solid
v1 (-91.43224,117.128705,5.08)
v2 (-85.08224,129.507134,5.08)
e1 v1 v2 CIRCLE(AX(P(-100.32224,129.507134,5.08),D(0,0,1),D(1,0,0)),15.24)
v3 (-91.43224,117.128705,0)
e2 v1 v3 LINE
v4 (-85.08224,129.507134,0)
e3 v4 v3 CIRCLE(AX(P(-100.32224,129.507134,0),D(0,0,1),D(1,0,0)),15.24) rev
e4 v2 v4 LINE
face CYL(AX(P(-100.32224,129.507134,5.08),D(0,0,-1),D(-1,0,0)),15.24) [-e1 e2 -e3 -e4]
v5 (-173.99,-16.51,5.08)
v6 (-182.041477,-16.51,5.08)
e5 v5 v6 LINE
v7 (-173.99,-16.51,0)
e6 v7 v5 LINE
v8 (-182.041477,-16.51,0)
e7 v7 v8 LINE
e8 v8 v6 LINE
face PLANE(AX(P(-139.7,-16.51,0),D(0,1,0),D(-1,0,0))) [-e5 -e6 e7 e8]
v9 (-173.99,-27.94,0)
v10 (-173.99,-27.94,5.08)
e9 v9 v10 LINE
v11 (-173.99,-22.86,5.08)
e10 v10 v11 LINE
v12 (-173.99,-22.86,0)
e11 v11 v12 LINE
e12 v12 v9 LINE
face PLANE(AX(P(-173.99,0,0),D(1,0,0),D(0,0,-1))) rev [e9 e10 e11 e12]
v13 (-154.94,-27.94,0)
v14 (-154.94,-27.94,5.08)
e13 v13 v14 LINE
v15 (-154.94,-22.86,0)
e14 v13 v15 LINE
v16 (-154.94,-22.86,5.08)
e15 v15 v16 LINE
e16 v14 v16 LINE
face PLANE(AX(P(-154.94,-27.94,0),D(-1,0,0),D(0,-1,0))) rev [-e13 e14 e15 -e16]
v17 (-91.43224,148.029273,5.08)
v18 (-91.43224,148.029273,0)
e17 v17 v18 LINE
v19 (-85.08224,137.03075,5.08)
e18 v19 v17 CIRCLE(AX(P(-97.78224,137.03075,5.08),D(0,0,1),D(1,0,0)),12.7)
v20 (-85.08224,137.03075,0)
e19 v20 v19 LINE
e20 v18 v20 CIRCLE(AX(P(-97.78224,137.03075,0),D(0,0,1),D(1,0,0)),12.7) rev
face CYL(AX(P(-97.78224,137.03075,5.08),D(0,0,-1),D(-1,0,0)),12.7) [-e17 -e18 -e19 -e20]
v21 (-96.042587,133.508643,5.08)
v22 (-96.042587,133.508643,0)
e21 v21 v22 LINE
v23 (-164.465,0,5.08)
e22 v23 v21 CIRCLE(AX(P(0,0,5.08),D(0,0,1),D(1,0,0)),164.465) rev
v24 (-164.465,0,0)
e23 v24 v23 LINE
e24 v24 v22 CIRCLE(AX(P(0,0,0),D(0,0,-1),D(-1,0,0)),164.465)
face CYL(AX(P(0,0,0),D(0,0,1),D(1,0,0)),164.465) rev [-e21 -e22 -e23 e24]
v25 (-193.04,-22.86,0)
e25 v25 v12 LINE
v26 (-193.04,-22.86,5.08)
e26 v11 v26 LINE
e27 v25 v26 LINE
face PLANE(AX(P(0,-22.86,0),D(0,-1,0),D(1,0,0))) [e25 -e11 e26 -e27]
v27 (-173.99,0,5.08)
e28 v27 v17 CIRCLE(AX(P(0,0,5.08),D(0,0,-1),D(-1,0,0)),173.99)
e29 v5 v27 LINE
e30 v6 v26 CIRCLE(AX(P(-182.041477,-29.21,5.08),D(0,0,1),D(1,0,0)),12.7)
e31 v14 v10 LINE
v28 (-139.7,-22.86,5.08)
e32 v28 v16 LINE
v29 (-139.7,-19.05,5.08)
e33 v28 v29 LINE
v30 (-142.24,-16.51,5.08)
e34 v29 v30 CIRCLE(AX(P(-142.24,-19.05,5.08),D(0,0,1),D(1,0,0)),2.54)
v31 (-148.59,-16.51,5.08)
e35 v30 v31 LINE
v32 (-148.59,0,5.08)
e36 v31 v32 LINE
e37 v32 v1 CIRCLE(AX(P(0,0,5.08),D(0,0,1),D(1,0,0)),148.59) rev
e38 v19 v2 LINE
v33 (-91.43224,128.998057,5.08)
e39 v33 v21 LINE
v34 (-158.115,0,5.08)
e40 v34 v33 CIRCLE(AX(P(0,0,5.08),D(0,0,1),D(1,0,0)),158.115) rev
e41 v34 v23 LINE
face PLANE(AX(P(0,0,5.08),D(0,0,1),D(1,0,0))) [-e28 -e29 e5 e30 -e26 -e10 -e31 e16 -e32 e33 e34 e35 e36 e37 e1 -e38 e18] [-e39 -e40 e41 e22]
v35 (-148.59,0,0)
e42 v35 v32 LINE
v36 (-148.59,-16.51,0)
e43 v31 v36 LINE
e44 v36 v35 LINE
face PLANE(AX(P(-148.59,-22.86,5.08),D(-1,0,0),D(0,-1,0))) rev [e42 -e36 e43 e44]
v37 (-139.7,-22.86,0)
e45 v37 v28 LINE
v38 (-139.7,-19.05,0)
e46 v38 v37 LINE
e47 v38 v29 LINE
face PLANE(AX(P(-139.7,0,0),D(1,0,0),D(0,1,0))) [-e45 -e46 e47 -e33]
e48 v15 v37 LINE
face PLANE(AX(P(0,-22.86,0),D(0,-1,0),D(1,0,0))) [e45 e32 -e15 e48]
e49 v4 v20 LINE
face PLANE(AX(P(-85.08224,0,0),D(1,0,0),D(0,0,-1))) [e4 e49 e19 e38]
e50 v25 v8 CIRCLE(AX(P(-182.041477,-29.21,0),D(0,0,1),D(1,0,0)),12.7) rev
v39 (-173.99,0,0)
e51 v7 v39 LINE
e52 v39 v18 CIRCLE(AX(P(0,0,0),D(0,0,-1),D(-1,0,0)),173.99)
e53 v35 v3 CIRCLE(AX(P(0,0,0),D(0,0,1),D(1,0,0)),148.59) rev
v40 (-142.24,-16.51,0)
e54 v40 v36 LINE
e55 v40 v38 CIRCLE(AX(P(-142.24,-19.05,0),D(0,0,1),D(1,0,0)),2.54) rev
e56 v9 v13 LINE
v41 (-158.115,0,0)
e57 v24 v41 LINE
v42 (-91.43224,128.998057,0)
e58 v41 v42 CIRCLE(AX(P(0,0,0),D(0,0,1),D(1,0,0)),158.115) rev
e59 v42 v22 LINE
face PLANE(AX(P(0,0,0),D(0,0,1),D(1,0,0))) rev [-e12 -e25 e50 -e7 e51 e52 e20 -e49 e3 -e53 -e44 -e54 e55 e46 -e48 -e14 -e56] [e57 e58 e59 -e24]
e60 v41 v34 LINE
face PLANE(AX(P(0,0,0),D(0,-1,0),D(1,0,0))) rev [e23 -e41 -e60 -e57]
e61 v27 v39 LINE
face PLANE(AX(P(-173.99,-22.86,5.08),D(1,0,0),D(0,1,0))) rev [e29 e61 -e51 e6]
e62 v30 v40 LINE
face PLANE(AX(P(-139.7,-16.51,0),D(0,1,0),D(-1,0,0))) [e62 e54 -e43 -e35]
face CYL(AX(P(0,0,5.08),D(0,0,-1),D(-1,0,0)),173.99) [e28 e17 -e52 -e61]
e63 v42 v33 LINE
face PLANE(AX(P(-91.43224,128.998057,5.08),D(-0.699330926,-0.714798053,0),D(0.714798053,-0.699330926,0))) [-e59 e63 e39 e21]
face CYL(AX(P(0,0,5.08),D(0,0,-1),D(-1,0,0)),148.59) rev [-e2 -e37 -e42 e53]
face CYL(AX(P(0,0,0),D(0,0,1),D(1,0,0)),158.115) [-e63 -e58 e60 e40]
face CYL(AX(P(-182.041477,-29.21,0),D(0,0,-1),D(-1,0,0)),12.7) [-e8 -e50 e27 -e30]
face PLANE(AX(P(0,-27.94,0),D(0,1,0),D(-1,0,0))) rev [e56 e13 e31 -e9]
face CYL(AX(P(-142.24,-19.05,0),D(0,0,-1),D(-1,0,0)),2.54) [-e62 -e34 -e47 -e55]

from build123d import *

# Parameters (mm, degrees)
EXTRUDE_THIN2_DEPTH          = 5.08
CUT_EXTRUDE_THIN3_DEPTH      = 247.111451582
CUT_EXTRUDE_THIN3_DEPTH_BACK = 5.08
SKETCH9_W                    = 25.4
SKETCH9_H                    = 5.08
BOSS_EXTRUDE3_DEPTH          = 22.86
BOSS_EXTRUDE4_DEPTH          = 19.05
BOSS_EXTRUDE4_DEPTH_BACK     = 34.29
SKETCH10_W                   = 5.08
SKETCH10_H                   = 6.35
SKETCH11_W                   = 12.7
SKETCH11_H                   = 5.08
BOSS_EXTRUDE5_DEPTH          = 5.08
SKETCH12_W                   = 168.813467259
SKETCH12_H                   = 220.237806267
CUT_EXTRUDE1_DEPTH           = 260.928390331
SKETCH13_W                   = 5.08
SKETCH13_H                   = 30.900567514
BOSS_EXTRUDE6_DEPTH          = 6.35
FILLET2_R                    = 15.24
FILLET3_R                    = 12.7
FILLET4_R                    = 12.7
FILLET5_R                    = 2.54
BOSS_EXTRUDE14_DEPTH         = 5.08
SKETCH16_W                   = 5.08
SKETCH16_H                   = 5.08
BOSS_EXTRUDE15_DEPTH         = 6.35


with BuildPart() as part:
    # Sketch7 → Extrude-Thin2 (new body)
    with BuildSketch(Plane.XY):
        with BuildLine():
            ThreePointArc((-173.99, 0), (-123.029508859, 123.029508859), (0, 173.99))
            Line((0, 173.99), (0, 148.59))
            ThreePointArc((0, 148.59), (-105.068996617, 105.068996617), (-148.59, 0))
            Line((-148.59, 0), (-173.99, 0))
        make_face()
    extrude(amount=EXTRUDE_THIN2_DEPTH)

    # Sketch8 → Cut-Extrude-Thin3 (cut, two sides: drawn at the far end of the back side and taken through both)
    with BuildSketch(Plane.XY.offset(5.08).offset(-CUT_EXTRUDE_THIN3_DEPTH_BACK)):
        with BuildLine():
            ThreePointArc((-164.465, 0), (-116.294316768, 116.294316768), (0, 164.465))
            Line((0, 164.465), (0, 158.115))
            ThreePointArc((0, 158.115), (-111.804188707, 111.804188707), (-158.115, 0))
            Line((-158.115, 0), (-164.465, 0))
        make_face()
    extrude(amount=CUT_EXTRUDE_THIN3_DEPTH + CUT_EXTRUDE_THIN3_DEPTH_BACK, mode=Mode.SUBTRACT)


with BuildPart() as cut_extrude_thin3_piece_1:
    # of the separate pieces the step leaves, piece 1, a body of its own (cut_extrude_thin3_pieces)
    add(part.part.solids().sort_by_distance((0, 173.99, 0))[0])



with BuildPart() as cut_extrude_thin3_piece_2:
    # of the separate pieces the step leaves, piece 2, a body of its own (cut_extrude_thin3_pieces)
    add(part.part.solids().sort_by_distance((0, 158.115, 0))[0])


with BuildPart() as cut_extrude_thin3_piece_1_1:
    add(cut_extrude_thin3_piece_1.part)

    add(cut_extrude_thin3_piece_2.part)  # Boss-Extrude3 merges Cut-Extrude-Thin3 piece 2
    # Sketch9 → Boss-Extrude3 (add)
    with BuildSketch(Plane.XZ):
        with Locations((-161.29, 2.54)):
            Rectangle(SKETCH9_W, SKETCH9_H)
    extrude(amount=BOSS_EXTRUDE3_DEPTH)

    # Sketch10 → Boss-Extrude4 (add, two sides: drawn at the far end of the back side and taken through both)
    with BuildSketch(Plane.ZY.offset(173.99).offset(-BOSS_EXTRUDE4_DEPTH_BACK)):
        with Locations((2.54, -19.685)):
            Rectangle(SKETCH10_W, SKETCH10_H)
    extrude(amount=BOSS_EXTRUDE4_DEPTH + BOSS_EXTRUDE4_DEPTH_BACK)

    # Sketch11 → Boss-Extrude5 (add)
    with BuildSketch(Plane.XZ.offset(22.86)):
        with Locations((-161.29, 2.54)):
            Rectangle(SKETCH11_W, SKETCH11_H)
    extrude(amount=BOSS_EXTRUDE5_DEPTH)

    # Sketch12 → Cut-Extrude1 (cut, through all)
    with BuildSketch(Plane.XY.offset(5.08)):
        with Locations((-7.025506372, 87.258903133)):
            Rectangle(SKETCH12_W, SKETCH12_H)
    extrude(amount=-CUT_EXTRUDE1_DEPTH, mode=Mode.SUBTRACT)

    # Sketch13 → Boss-Extrude6 (add)
    with BuildSketch(Plane(origin=(-91.432240001, 0, 0), x_dir=(0, 0, -1), z_dir=(1, 0, 0))):
        with Locations((-2.54, 132.578988985)):
            Rectangle(SKETCH13_W, SKETCH13_H)
    extrude(amount=BOSS_EXTRUDE6_DEPTH)

    # Fillet2
    # the kernel refuses this fillet: 15.24 mm, written as the material it takes off along each edge
    with BuildSketch(Plane(origin=(-85.082240001, 117.128705228, -30.946072045), x_dir=(-1, 0, 0), z_dir=(0, 0, 1))) as fillet2_piece_1:
        with BuildLine():
            CenterArc((15.24, -12.378428818), FILLET2_R, 125.685334713, 54.314665287)
            Line((0, -12.378428818), (-0.3048, -12.378428818))
            Line((-0.3048, -12.378428818), (-0.3048, 0))
            Line((-0.3048, 0), (0, 0.3048))
            ThreePointArc((0, 0.3048), (3.175, 0.3048), (6.1722, 0.247568576))
            Line((6.1722, 0.247568576), (6.35, 0))
        make_face()
    extrude(amount=66.97214409, mode=Mode.SUBTRACT)

    # Fillet3
    # the kernel refuses this fillet: 12.7 mm, written as the material it takes off along each edge
    with BuildSketch(Plane(origin=(-85.082240001, 148.029272742, 32.57630657), x_dir=(0, -1, 0), z_dir=(0, 0, -1))) as fillet3_piece_1:
        with BuildLine():
            CenterArc((10.998522628, 12.7), FILLET3_R, 210, 60)
            Line((0, 6.35), (-0.219970453, 6.223))
            ThreePointArc((-0.219970453, 6.223), (-0.254, 3.175), (-0.254, 0))
            Line((-0.254, 0), (0, -0.254))
            Line((0, -0.254), (10.998522628, -0.254))
            Line((10.998522628, -0.254), (10.998522628, 0))
        make_face()
    extrude(amount=60.07261314, mode=Mode.SUBTRACT)

    # Fillet4
    # the kernel refuses this fillet: 12.7 mm, written as the material it takes off along each edge
    with BuildSketch(Plane(origin=(-193.04, -16.51, 32.57630657), x_dir=(1, 0, 0), z_dir=(0, 0, -1))) as fillet4_piece_1:
        with BuildLine():
            CenterArc((10.998522628, 12.7), FILLET4_R, 210, 60)
            Line((0, 6.35), (-0.219970453, 6.223))
            ThreePointArc((-0.219970453, 6.223), (-0.254, 3.175), (-0.254, 0))
            Line((-0.254, 0), (0, -0.254))
            Line((0, -0.254), (10.998522628, -0.254))
            Line((10.998522628, -0.254), (10.998522628, 0))
        make_face()
    extrude(amount=60.07261314, mode=Mode.SUBTRACT)

    # Fillet5
    fillet5_edges = [cut_extrude_thin3_piece_1_1.edges().sort_by_distance(p)[0] for p in [
        (-139.7, -16.51, 2.54),
    ]]
    fillet(fillet5_edges, radius=FILLET5_R)

    # Sketch15 → Boss-Extrude14 (add)
    with BuildSketch(Plane.XY):
        Polygon((-91.432240001, 128.998057014), (-96.042586765, 133.508642988), (-90.011669105, 142.911064998), (-86.217351324, 133.783124359), align=None)
    extrude(amount=BOSS_EXTRUDE14_DEPTH)

    # Sketch16 → Boss-Extrude15 (add)
    with BuildSketch(Plane.ZY.offset(167.64)):
        with Locations((2.54, -25.4)):
            Rectangle(SKETCH16_W, SKETCH16_H)
    extrude(amount=BOSS_EXTRUDE15_DEPTH)


solid = cut_extrude_thin3_piece_1_1.part
